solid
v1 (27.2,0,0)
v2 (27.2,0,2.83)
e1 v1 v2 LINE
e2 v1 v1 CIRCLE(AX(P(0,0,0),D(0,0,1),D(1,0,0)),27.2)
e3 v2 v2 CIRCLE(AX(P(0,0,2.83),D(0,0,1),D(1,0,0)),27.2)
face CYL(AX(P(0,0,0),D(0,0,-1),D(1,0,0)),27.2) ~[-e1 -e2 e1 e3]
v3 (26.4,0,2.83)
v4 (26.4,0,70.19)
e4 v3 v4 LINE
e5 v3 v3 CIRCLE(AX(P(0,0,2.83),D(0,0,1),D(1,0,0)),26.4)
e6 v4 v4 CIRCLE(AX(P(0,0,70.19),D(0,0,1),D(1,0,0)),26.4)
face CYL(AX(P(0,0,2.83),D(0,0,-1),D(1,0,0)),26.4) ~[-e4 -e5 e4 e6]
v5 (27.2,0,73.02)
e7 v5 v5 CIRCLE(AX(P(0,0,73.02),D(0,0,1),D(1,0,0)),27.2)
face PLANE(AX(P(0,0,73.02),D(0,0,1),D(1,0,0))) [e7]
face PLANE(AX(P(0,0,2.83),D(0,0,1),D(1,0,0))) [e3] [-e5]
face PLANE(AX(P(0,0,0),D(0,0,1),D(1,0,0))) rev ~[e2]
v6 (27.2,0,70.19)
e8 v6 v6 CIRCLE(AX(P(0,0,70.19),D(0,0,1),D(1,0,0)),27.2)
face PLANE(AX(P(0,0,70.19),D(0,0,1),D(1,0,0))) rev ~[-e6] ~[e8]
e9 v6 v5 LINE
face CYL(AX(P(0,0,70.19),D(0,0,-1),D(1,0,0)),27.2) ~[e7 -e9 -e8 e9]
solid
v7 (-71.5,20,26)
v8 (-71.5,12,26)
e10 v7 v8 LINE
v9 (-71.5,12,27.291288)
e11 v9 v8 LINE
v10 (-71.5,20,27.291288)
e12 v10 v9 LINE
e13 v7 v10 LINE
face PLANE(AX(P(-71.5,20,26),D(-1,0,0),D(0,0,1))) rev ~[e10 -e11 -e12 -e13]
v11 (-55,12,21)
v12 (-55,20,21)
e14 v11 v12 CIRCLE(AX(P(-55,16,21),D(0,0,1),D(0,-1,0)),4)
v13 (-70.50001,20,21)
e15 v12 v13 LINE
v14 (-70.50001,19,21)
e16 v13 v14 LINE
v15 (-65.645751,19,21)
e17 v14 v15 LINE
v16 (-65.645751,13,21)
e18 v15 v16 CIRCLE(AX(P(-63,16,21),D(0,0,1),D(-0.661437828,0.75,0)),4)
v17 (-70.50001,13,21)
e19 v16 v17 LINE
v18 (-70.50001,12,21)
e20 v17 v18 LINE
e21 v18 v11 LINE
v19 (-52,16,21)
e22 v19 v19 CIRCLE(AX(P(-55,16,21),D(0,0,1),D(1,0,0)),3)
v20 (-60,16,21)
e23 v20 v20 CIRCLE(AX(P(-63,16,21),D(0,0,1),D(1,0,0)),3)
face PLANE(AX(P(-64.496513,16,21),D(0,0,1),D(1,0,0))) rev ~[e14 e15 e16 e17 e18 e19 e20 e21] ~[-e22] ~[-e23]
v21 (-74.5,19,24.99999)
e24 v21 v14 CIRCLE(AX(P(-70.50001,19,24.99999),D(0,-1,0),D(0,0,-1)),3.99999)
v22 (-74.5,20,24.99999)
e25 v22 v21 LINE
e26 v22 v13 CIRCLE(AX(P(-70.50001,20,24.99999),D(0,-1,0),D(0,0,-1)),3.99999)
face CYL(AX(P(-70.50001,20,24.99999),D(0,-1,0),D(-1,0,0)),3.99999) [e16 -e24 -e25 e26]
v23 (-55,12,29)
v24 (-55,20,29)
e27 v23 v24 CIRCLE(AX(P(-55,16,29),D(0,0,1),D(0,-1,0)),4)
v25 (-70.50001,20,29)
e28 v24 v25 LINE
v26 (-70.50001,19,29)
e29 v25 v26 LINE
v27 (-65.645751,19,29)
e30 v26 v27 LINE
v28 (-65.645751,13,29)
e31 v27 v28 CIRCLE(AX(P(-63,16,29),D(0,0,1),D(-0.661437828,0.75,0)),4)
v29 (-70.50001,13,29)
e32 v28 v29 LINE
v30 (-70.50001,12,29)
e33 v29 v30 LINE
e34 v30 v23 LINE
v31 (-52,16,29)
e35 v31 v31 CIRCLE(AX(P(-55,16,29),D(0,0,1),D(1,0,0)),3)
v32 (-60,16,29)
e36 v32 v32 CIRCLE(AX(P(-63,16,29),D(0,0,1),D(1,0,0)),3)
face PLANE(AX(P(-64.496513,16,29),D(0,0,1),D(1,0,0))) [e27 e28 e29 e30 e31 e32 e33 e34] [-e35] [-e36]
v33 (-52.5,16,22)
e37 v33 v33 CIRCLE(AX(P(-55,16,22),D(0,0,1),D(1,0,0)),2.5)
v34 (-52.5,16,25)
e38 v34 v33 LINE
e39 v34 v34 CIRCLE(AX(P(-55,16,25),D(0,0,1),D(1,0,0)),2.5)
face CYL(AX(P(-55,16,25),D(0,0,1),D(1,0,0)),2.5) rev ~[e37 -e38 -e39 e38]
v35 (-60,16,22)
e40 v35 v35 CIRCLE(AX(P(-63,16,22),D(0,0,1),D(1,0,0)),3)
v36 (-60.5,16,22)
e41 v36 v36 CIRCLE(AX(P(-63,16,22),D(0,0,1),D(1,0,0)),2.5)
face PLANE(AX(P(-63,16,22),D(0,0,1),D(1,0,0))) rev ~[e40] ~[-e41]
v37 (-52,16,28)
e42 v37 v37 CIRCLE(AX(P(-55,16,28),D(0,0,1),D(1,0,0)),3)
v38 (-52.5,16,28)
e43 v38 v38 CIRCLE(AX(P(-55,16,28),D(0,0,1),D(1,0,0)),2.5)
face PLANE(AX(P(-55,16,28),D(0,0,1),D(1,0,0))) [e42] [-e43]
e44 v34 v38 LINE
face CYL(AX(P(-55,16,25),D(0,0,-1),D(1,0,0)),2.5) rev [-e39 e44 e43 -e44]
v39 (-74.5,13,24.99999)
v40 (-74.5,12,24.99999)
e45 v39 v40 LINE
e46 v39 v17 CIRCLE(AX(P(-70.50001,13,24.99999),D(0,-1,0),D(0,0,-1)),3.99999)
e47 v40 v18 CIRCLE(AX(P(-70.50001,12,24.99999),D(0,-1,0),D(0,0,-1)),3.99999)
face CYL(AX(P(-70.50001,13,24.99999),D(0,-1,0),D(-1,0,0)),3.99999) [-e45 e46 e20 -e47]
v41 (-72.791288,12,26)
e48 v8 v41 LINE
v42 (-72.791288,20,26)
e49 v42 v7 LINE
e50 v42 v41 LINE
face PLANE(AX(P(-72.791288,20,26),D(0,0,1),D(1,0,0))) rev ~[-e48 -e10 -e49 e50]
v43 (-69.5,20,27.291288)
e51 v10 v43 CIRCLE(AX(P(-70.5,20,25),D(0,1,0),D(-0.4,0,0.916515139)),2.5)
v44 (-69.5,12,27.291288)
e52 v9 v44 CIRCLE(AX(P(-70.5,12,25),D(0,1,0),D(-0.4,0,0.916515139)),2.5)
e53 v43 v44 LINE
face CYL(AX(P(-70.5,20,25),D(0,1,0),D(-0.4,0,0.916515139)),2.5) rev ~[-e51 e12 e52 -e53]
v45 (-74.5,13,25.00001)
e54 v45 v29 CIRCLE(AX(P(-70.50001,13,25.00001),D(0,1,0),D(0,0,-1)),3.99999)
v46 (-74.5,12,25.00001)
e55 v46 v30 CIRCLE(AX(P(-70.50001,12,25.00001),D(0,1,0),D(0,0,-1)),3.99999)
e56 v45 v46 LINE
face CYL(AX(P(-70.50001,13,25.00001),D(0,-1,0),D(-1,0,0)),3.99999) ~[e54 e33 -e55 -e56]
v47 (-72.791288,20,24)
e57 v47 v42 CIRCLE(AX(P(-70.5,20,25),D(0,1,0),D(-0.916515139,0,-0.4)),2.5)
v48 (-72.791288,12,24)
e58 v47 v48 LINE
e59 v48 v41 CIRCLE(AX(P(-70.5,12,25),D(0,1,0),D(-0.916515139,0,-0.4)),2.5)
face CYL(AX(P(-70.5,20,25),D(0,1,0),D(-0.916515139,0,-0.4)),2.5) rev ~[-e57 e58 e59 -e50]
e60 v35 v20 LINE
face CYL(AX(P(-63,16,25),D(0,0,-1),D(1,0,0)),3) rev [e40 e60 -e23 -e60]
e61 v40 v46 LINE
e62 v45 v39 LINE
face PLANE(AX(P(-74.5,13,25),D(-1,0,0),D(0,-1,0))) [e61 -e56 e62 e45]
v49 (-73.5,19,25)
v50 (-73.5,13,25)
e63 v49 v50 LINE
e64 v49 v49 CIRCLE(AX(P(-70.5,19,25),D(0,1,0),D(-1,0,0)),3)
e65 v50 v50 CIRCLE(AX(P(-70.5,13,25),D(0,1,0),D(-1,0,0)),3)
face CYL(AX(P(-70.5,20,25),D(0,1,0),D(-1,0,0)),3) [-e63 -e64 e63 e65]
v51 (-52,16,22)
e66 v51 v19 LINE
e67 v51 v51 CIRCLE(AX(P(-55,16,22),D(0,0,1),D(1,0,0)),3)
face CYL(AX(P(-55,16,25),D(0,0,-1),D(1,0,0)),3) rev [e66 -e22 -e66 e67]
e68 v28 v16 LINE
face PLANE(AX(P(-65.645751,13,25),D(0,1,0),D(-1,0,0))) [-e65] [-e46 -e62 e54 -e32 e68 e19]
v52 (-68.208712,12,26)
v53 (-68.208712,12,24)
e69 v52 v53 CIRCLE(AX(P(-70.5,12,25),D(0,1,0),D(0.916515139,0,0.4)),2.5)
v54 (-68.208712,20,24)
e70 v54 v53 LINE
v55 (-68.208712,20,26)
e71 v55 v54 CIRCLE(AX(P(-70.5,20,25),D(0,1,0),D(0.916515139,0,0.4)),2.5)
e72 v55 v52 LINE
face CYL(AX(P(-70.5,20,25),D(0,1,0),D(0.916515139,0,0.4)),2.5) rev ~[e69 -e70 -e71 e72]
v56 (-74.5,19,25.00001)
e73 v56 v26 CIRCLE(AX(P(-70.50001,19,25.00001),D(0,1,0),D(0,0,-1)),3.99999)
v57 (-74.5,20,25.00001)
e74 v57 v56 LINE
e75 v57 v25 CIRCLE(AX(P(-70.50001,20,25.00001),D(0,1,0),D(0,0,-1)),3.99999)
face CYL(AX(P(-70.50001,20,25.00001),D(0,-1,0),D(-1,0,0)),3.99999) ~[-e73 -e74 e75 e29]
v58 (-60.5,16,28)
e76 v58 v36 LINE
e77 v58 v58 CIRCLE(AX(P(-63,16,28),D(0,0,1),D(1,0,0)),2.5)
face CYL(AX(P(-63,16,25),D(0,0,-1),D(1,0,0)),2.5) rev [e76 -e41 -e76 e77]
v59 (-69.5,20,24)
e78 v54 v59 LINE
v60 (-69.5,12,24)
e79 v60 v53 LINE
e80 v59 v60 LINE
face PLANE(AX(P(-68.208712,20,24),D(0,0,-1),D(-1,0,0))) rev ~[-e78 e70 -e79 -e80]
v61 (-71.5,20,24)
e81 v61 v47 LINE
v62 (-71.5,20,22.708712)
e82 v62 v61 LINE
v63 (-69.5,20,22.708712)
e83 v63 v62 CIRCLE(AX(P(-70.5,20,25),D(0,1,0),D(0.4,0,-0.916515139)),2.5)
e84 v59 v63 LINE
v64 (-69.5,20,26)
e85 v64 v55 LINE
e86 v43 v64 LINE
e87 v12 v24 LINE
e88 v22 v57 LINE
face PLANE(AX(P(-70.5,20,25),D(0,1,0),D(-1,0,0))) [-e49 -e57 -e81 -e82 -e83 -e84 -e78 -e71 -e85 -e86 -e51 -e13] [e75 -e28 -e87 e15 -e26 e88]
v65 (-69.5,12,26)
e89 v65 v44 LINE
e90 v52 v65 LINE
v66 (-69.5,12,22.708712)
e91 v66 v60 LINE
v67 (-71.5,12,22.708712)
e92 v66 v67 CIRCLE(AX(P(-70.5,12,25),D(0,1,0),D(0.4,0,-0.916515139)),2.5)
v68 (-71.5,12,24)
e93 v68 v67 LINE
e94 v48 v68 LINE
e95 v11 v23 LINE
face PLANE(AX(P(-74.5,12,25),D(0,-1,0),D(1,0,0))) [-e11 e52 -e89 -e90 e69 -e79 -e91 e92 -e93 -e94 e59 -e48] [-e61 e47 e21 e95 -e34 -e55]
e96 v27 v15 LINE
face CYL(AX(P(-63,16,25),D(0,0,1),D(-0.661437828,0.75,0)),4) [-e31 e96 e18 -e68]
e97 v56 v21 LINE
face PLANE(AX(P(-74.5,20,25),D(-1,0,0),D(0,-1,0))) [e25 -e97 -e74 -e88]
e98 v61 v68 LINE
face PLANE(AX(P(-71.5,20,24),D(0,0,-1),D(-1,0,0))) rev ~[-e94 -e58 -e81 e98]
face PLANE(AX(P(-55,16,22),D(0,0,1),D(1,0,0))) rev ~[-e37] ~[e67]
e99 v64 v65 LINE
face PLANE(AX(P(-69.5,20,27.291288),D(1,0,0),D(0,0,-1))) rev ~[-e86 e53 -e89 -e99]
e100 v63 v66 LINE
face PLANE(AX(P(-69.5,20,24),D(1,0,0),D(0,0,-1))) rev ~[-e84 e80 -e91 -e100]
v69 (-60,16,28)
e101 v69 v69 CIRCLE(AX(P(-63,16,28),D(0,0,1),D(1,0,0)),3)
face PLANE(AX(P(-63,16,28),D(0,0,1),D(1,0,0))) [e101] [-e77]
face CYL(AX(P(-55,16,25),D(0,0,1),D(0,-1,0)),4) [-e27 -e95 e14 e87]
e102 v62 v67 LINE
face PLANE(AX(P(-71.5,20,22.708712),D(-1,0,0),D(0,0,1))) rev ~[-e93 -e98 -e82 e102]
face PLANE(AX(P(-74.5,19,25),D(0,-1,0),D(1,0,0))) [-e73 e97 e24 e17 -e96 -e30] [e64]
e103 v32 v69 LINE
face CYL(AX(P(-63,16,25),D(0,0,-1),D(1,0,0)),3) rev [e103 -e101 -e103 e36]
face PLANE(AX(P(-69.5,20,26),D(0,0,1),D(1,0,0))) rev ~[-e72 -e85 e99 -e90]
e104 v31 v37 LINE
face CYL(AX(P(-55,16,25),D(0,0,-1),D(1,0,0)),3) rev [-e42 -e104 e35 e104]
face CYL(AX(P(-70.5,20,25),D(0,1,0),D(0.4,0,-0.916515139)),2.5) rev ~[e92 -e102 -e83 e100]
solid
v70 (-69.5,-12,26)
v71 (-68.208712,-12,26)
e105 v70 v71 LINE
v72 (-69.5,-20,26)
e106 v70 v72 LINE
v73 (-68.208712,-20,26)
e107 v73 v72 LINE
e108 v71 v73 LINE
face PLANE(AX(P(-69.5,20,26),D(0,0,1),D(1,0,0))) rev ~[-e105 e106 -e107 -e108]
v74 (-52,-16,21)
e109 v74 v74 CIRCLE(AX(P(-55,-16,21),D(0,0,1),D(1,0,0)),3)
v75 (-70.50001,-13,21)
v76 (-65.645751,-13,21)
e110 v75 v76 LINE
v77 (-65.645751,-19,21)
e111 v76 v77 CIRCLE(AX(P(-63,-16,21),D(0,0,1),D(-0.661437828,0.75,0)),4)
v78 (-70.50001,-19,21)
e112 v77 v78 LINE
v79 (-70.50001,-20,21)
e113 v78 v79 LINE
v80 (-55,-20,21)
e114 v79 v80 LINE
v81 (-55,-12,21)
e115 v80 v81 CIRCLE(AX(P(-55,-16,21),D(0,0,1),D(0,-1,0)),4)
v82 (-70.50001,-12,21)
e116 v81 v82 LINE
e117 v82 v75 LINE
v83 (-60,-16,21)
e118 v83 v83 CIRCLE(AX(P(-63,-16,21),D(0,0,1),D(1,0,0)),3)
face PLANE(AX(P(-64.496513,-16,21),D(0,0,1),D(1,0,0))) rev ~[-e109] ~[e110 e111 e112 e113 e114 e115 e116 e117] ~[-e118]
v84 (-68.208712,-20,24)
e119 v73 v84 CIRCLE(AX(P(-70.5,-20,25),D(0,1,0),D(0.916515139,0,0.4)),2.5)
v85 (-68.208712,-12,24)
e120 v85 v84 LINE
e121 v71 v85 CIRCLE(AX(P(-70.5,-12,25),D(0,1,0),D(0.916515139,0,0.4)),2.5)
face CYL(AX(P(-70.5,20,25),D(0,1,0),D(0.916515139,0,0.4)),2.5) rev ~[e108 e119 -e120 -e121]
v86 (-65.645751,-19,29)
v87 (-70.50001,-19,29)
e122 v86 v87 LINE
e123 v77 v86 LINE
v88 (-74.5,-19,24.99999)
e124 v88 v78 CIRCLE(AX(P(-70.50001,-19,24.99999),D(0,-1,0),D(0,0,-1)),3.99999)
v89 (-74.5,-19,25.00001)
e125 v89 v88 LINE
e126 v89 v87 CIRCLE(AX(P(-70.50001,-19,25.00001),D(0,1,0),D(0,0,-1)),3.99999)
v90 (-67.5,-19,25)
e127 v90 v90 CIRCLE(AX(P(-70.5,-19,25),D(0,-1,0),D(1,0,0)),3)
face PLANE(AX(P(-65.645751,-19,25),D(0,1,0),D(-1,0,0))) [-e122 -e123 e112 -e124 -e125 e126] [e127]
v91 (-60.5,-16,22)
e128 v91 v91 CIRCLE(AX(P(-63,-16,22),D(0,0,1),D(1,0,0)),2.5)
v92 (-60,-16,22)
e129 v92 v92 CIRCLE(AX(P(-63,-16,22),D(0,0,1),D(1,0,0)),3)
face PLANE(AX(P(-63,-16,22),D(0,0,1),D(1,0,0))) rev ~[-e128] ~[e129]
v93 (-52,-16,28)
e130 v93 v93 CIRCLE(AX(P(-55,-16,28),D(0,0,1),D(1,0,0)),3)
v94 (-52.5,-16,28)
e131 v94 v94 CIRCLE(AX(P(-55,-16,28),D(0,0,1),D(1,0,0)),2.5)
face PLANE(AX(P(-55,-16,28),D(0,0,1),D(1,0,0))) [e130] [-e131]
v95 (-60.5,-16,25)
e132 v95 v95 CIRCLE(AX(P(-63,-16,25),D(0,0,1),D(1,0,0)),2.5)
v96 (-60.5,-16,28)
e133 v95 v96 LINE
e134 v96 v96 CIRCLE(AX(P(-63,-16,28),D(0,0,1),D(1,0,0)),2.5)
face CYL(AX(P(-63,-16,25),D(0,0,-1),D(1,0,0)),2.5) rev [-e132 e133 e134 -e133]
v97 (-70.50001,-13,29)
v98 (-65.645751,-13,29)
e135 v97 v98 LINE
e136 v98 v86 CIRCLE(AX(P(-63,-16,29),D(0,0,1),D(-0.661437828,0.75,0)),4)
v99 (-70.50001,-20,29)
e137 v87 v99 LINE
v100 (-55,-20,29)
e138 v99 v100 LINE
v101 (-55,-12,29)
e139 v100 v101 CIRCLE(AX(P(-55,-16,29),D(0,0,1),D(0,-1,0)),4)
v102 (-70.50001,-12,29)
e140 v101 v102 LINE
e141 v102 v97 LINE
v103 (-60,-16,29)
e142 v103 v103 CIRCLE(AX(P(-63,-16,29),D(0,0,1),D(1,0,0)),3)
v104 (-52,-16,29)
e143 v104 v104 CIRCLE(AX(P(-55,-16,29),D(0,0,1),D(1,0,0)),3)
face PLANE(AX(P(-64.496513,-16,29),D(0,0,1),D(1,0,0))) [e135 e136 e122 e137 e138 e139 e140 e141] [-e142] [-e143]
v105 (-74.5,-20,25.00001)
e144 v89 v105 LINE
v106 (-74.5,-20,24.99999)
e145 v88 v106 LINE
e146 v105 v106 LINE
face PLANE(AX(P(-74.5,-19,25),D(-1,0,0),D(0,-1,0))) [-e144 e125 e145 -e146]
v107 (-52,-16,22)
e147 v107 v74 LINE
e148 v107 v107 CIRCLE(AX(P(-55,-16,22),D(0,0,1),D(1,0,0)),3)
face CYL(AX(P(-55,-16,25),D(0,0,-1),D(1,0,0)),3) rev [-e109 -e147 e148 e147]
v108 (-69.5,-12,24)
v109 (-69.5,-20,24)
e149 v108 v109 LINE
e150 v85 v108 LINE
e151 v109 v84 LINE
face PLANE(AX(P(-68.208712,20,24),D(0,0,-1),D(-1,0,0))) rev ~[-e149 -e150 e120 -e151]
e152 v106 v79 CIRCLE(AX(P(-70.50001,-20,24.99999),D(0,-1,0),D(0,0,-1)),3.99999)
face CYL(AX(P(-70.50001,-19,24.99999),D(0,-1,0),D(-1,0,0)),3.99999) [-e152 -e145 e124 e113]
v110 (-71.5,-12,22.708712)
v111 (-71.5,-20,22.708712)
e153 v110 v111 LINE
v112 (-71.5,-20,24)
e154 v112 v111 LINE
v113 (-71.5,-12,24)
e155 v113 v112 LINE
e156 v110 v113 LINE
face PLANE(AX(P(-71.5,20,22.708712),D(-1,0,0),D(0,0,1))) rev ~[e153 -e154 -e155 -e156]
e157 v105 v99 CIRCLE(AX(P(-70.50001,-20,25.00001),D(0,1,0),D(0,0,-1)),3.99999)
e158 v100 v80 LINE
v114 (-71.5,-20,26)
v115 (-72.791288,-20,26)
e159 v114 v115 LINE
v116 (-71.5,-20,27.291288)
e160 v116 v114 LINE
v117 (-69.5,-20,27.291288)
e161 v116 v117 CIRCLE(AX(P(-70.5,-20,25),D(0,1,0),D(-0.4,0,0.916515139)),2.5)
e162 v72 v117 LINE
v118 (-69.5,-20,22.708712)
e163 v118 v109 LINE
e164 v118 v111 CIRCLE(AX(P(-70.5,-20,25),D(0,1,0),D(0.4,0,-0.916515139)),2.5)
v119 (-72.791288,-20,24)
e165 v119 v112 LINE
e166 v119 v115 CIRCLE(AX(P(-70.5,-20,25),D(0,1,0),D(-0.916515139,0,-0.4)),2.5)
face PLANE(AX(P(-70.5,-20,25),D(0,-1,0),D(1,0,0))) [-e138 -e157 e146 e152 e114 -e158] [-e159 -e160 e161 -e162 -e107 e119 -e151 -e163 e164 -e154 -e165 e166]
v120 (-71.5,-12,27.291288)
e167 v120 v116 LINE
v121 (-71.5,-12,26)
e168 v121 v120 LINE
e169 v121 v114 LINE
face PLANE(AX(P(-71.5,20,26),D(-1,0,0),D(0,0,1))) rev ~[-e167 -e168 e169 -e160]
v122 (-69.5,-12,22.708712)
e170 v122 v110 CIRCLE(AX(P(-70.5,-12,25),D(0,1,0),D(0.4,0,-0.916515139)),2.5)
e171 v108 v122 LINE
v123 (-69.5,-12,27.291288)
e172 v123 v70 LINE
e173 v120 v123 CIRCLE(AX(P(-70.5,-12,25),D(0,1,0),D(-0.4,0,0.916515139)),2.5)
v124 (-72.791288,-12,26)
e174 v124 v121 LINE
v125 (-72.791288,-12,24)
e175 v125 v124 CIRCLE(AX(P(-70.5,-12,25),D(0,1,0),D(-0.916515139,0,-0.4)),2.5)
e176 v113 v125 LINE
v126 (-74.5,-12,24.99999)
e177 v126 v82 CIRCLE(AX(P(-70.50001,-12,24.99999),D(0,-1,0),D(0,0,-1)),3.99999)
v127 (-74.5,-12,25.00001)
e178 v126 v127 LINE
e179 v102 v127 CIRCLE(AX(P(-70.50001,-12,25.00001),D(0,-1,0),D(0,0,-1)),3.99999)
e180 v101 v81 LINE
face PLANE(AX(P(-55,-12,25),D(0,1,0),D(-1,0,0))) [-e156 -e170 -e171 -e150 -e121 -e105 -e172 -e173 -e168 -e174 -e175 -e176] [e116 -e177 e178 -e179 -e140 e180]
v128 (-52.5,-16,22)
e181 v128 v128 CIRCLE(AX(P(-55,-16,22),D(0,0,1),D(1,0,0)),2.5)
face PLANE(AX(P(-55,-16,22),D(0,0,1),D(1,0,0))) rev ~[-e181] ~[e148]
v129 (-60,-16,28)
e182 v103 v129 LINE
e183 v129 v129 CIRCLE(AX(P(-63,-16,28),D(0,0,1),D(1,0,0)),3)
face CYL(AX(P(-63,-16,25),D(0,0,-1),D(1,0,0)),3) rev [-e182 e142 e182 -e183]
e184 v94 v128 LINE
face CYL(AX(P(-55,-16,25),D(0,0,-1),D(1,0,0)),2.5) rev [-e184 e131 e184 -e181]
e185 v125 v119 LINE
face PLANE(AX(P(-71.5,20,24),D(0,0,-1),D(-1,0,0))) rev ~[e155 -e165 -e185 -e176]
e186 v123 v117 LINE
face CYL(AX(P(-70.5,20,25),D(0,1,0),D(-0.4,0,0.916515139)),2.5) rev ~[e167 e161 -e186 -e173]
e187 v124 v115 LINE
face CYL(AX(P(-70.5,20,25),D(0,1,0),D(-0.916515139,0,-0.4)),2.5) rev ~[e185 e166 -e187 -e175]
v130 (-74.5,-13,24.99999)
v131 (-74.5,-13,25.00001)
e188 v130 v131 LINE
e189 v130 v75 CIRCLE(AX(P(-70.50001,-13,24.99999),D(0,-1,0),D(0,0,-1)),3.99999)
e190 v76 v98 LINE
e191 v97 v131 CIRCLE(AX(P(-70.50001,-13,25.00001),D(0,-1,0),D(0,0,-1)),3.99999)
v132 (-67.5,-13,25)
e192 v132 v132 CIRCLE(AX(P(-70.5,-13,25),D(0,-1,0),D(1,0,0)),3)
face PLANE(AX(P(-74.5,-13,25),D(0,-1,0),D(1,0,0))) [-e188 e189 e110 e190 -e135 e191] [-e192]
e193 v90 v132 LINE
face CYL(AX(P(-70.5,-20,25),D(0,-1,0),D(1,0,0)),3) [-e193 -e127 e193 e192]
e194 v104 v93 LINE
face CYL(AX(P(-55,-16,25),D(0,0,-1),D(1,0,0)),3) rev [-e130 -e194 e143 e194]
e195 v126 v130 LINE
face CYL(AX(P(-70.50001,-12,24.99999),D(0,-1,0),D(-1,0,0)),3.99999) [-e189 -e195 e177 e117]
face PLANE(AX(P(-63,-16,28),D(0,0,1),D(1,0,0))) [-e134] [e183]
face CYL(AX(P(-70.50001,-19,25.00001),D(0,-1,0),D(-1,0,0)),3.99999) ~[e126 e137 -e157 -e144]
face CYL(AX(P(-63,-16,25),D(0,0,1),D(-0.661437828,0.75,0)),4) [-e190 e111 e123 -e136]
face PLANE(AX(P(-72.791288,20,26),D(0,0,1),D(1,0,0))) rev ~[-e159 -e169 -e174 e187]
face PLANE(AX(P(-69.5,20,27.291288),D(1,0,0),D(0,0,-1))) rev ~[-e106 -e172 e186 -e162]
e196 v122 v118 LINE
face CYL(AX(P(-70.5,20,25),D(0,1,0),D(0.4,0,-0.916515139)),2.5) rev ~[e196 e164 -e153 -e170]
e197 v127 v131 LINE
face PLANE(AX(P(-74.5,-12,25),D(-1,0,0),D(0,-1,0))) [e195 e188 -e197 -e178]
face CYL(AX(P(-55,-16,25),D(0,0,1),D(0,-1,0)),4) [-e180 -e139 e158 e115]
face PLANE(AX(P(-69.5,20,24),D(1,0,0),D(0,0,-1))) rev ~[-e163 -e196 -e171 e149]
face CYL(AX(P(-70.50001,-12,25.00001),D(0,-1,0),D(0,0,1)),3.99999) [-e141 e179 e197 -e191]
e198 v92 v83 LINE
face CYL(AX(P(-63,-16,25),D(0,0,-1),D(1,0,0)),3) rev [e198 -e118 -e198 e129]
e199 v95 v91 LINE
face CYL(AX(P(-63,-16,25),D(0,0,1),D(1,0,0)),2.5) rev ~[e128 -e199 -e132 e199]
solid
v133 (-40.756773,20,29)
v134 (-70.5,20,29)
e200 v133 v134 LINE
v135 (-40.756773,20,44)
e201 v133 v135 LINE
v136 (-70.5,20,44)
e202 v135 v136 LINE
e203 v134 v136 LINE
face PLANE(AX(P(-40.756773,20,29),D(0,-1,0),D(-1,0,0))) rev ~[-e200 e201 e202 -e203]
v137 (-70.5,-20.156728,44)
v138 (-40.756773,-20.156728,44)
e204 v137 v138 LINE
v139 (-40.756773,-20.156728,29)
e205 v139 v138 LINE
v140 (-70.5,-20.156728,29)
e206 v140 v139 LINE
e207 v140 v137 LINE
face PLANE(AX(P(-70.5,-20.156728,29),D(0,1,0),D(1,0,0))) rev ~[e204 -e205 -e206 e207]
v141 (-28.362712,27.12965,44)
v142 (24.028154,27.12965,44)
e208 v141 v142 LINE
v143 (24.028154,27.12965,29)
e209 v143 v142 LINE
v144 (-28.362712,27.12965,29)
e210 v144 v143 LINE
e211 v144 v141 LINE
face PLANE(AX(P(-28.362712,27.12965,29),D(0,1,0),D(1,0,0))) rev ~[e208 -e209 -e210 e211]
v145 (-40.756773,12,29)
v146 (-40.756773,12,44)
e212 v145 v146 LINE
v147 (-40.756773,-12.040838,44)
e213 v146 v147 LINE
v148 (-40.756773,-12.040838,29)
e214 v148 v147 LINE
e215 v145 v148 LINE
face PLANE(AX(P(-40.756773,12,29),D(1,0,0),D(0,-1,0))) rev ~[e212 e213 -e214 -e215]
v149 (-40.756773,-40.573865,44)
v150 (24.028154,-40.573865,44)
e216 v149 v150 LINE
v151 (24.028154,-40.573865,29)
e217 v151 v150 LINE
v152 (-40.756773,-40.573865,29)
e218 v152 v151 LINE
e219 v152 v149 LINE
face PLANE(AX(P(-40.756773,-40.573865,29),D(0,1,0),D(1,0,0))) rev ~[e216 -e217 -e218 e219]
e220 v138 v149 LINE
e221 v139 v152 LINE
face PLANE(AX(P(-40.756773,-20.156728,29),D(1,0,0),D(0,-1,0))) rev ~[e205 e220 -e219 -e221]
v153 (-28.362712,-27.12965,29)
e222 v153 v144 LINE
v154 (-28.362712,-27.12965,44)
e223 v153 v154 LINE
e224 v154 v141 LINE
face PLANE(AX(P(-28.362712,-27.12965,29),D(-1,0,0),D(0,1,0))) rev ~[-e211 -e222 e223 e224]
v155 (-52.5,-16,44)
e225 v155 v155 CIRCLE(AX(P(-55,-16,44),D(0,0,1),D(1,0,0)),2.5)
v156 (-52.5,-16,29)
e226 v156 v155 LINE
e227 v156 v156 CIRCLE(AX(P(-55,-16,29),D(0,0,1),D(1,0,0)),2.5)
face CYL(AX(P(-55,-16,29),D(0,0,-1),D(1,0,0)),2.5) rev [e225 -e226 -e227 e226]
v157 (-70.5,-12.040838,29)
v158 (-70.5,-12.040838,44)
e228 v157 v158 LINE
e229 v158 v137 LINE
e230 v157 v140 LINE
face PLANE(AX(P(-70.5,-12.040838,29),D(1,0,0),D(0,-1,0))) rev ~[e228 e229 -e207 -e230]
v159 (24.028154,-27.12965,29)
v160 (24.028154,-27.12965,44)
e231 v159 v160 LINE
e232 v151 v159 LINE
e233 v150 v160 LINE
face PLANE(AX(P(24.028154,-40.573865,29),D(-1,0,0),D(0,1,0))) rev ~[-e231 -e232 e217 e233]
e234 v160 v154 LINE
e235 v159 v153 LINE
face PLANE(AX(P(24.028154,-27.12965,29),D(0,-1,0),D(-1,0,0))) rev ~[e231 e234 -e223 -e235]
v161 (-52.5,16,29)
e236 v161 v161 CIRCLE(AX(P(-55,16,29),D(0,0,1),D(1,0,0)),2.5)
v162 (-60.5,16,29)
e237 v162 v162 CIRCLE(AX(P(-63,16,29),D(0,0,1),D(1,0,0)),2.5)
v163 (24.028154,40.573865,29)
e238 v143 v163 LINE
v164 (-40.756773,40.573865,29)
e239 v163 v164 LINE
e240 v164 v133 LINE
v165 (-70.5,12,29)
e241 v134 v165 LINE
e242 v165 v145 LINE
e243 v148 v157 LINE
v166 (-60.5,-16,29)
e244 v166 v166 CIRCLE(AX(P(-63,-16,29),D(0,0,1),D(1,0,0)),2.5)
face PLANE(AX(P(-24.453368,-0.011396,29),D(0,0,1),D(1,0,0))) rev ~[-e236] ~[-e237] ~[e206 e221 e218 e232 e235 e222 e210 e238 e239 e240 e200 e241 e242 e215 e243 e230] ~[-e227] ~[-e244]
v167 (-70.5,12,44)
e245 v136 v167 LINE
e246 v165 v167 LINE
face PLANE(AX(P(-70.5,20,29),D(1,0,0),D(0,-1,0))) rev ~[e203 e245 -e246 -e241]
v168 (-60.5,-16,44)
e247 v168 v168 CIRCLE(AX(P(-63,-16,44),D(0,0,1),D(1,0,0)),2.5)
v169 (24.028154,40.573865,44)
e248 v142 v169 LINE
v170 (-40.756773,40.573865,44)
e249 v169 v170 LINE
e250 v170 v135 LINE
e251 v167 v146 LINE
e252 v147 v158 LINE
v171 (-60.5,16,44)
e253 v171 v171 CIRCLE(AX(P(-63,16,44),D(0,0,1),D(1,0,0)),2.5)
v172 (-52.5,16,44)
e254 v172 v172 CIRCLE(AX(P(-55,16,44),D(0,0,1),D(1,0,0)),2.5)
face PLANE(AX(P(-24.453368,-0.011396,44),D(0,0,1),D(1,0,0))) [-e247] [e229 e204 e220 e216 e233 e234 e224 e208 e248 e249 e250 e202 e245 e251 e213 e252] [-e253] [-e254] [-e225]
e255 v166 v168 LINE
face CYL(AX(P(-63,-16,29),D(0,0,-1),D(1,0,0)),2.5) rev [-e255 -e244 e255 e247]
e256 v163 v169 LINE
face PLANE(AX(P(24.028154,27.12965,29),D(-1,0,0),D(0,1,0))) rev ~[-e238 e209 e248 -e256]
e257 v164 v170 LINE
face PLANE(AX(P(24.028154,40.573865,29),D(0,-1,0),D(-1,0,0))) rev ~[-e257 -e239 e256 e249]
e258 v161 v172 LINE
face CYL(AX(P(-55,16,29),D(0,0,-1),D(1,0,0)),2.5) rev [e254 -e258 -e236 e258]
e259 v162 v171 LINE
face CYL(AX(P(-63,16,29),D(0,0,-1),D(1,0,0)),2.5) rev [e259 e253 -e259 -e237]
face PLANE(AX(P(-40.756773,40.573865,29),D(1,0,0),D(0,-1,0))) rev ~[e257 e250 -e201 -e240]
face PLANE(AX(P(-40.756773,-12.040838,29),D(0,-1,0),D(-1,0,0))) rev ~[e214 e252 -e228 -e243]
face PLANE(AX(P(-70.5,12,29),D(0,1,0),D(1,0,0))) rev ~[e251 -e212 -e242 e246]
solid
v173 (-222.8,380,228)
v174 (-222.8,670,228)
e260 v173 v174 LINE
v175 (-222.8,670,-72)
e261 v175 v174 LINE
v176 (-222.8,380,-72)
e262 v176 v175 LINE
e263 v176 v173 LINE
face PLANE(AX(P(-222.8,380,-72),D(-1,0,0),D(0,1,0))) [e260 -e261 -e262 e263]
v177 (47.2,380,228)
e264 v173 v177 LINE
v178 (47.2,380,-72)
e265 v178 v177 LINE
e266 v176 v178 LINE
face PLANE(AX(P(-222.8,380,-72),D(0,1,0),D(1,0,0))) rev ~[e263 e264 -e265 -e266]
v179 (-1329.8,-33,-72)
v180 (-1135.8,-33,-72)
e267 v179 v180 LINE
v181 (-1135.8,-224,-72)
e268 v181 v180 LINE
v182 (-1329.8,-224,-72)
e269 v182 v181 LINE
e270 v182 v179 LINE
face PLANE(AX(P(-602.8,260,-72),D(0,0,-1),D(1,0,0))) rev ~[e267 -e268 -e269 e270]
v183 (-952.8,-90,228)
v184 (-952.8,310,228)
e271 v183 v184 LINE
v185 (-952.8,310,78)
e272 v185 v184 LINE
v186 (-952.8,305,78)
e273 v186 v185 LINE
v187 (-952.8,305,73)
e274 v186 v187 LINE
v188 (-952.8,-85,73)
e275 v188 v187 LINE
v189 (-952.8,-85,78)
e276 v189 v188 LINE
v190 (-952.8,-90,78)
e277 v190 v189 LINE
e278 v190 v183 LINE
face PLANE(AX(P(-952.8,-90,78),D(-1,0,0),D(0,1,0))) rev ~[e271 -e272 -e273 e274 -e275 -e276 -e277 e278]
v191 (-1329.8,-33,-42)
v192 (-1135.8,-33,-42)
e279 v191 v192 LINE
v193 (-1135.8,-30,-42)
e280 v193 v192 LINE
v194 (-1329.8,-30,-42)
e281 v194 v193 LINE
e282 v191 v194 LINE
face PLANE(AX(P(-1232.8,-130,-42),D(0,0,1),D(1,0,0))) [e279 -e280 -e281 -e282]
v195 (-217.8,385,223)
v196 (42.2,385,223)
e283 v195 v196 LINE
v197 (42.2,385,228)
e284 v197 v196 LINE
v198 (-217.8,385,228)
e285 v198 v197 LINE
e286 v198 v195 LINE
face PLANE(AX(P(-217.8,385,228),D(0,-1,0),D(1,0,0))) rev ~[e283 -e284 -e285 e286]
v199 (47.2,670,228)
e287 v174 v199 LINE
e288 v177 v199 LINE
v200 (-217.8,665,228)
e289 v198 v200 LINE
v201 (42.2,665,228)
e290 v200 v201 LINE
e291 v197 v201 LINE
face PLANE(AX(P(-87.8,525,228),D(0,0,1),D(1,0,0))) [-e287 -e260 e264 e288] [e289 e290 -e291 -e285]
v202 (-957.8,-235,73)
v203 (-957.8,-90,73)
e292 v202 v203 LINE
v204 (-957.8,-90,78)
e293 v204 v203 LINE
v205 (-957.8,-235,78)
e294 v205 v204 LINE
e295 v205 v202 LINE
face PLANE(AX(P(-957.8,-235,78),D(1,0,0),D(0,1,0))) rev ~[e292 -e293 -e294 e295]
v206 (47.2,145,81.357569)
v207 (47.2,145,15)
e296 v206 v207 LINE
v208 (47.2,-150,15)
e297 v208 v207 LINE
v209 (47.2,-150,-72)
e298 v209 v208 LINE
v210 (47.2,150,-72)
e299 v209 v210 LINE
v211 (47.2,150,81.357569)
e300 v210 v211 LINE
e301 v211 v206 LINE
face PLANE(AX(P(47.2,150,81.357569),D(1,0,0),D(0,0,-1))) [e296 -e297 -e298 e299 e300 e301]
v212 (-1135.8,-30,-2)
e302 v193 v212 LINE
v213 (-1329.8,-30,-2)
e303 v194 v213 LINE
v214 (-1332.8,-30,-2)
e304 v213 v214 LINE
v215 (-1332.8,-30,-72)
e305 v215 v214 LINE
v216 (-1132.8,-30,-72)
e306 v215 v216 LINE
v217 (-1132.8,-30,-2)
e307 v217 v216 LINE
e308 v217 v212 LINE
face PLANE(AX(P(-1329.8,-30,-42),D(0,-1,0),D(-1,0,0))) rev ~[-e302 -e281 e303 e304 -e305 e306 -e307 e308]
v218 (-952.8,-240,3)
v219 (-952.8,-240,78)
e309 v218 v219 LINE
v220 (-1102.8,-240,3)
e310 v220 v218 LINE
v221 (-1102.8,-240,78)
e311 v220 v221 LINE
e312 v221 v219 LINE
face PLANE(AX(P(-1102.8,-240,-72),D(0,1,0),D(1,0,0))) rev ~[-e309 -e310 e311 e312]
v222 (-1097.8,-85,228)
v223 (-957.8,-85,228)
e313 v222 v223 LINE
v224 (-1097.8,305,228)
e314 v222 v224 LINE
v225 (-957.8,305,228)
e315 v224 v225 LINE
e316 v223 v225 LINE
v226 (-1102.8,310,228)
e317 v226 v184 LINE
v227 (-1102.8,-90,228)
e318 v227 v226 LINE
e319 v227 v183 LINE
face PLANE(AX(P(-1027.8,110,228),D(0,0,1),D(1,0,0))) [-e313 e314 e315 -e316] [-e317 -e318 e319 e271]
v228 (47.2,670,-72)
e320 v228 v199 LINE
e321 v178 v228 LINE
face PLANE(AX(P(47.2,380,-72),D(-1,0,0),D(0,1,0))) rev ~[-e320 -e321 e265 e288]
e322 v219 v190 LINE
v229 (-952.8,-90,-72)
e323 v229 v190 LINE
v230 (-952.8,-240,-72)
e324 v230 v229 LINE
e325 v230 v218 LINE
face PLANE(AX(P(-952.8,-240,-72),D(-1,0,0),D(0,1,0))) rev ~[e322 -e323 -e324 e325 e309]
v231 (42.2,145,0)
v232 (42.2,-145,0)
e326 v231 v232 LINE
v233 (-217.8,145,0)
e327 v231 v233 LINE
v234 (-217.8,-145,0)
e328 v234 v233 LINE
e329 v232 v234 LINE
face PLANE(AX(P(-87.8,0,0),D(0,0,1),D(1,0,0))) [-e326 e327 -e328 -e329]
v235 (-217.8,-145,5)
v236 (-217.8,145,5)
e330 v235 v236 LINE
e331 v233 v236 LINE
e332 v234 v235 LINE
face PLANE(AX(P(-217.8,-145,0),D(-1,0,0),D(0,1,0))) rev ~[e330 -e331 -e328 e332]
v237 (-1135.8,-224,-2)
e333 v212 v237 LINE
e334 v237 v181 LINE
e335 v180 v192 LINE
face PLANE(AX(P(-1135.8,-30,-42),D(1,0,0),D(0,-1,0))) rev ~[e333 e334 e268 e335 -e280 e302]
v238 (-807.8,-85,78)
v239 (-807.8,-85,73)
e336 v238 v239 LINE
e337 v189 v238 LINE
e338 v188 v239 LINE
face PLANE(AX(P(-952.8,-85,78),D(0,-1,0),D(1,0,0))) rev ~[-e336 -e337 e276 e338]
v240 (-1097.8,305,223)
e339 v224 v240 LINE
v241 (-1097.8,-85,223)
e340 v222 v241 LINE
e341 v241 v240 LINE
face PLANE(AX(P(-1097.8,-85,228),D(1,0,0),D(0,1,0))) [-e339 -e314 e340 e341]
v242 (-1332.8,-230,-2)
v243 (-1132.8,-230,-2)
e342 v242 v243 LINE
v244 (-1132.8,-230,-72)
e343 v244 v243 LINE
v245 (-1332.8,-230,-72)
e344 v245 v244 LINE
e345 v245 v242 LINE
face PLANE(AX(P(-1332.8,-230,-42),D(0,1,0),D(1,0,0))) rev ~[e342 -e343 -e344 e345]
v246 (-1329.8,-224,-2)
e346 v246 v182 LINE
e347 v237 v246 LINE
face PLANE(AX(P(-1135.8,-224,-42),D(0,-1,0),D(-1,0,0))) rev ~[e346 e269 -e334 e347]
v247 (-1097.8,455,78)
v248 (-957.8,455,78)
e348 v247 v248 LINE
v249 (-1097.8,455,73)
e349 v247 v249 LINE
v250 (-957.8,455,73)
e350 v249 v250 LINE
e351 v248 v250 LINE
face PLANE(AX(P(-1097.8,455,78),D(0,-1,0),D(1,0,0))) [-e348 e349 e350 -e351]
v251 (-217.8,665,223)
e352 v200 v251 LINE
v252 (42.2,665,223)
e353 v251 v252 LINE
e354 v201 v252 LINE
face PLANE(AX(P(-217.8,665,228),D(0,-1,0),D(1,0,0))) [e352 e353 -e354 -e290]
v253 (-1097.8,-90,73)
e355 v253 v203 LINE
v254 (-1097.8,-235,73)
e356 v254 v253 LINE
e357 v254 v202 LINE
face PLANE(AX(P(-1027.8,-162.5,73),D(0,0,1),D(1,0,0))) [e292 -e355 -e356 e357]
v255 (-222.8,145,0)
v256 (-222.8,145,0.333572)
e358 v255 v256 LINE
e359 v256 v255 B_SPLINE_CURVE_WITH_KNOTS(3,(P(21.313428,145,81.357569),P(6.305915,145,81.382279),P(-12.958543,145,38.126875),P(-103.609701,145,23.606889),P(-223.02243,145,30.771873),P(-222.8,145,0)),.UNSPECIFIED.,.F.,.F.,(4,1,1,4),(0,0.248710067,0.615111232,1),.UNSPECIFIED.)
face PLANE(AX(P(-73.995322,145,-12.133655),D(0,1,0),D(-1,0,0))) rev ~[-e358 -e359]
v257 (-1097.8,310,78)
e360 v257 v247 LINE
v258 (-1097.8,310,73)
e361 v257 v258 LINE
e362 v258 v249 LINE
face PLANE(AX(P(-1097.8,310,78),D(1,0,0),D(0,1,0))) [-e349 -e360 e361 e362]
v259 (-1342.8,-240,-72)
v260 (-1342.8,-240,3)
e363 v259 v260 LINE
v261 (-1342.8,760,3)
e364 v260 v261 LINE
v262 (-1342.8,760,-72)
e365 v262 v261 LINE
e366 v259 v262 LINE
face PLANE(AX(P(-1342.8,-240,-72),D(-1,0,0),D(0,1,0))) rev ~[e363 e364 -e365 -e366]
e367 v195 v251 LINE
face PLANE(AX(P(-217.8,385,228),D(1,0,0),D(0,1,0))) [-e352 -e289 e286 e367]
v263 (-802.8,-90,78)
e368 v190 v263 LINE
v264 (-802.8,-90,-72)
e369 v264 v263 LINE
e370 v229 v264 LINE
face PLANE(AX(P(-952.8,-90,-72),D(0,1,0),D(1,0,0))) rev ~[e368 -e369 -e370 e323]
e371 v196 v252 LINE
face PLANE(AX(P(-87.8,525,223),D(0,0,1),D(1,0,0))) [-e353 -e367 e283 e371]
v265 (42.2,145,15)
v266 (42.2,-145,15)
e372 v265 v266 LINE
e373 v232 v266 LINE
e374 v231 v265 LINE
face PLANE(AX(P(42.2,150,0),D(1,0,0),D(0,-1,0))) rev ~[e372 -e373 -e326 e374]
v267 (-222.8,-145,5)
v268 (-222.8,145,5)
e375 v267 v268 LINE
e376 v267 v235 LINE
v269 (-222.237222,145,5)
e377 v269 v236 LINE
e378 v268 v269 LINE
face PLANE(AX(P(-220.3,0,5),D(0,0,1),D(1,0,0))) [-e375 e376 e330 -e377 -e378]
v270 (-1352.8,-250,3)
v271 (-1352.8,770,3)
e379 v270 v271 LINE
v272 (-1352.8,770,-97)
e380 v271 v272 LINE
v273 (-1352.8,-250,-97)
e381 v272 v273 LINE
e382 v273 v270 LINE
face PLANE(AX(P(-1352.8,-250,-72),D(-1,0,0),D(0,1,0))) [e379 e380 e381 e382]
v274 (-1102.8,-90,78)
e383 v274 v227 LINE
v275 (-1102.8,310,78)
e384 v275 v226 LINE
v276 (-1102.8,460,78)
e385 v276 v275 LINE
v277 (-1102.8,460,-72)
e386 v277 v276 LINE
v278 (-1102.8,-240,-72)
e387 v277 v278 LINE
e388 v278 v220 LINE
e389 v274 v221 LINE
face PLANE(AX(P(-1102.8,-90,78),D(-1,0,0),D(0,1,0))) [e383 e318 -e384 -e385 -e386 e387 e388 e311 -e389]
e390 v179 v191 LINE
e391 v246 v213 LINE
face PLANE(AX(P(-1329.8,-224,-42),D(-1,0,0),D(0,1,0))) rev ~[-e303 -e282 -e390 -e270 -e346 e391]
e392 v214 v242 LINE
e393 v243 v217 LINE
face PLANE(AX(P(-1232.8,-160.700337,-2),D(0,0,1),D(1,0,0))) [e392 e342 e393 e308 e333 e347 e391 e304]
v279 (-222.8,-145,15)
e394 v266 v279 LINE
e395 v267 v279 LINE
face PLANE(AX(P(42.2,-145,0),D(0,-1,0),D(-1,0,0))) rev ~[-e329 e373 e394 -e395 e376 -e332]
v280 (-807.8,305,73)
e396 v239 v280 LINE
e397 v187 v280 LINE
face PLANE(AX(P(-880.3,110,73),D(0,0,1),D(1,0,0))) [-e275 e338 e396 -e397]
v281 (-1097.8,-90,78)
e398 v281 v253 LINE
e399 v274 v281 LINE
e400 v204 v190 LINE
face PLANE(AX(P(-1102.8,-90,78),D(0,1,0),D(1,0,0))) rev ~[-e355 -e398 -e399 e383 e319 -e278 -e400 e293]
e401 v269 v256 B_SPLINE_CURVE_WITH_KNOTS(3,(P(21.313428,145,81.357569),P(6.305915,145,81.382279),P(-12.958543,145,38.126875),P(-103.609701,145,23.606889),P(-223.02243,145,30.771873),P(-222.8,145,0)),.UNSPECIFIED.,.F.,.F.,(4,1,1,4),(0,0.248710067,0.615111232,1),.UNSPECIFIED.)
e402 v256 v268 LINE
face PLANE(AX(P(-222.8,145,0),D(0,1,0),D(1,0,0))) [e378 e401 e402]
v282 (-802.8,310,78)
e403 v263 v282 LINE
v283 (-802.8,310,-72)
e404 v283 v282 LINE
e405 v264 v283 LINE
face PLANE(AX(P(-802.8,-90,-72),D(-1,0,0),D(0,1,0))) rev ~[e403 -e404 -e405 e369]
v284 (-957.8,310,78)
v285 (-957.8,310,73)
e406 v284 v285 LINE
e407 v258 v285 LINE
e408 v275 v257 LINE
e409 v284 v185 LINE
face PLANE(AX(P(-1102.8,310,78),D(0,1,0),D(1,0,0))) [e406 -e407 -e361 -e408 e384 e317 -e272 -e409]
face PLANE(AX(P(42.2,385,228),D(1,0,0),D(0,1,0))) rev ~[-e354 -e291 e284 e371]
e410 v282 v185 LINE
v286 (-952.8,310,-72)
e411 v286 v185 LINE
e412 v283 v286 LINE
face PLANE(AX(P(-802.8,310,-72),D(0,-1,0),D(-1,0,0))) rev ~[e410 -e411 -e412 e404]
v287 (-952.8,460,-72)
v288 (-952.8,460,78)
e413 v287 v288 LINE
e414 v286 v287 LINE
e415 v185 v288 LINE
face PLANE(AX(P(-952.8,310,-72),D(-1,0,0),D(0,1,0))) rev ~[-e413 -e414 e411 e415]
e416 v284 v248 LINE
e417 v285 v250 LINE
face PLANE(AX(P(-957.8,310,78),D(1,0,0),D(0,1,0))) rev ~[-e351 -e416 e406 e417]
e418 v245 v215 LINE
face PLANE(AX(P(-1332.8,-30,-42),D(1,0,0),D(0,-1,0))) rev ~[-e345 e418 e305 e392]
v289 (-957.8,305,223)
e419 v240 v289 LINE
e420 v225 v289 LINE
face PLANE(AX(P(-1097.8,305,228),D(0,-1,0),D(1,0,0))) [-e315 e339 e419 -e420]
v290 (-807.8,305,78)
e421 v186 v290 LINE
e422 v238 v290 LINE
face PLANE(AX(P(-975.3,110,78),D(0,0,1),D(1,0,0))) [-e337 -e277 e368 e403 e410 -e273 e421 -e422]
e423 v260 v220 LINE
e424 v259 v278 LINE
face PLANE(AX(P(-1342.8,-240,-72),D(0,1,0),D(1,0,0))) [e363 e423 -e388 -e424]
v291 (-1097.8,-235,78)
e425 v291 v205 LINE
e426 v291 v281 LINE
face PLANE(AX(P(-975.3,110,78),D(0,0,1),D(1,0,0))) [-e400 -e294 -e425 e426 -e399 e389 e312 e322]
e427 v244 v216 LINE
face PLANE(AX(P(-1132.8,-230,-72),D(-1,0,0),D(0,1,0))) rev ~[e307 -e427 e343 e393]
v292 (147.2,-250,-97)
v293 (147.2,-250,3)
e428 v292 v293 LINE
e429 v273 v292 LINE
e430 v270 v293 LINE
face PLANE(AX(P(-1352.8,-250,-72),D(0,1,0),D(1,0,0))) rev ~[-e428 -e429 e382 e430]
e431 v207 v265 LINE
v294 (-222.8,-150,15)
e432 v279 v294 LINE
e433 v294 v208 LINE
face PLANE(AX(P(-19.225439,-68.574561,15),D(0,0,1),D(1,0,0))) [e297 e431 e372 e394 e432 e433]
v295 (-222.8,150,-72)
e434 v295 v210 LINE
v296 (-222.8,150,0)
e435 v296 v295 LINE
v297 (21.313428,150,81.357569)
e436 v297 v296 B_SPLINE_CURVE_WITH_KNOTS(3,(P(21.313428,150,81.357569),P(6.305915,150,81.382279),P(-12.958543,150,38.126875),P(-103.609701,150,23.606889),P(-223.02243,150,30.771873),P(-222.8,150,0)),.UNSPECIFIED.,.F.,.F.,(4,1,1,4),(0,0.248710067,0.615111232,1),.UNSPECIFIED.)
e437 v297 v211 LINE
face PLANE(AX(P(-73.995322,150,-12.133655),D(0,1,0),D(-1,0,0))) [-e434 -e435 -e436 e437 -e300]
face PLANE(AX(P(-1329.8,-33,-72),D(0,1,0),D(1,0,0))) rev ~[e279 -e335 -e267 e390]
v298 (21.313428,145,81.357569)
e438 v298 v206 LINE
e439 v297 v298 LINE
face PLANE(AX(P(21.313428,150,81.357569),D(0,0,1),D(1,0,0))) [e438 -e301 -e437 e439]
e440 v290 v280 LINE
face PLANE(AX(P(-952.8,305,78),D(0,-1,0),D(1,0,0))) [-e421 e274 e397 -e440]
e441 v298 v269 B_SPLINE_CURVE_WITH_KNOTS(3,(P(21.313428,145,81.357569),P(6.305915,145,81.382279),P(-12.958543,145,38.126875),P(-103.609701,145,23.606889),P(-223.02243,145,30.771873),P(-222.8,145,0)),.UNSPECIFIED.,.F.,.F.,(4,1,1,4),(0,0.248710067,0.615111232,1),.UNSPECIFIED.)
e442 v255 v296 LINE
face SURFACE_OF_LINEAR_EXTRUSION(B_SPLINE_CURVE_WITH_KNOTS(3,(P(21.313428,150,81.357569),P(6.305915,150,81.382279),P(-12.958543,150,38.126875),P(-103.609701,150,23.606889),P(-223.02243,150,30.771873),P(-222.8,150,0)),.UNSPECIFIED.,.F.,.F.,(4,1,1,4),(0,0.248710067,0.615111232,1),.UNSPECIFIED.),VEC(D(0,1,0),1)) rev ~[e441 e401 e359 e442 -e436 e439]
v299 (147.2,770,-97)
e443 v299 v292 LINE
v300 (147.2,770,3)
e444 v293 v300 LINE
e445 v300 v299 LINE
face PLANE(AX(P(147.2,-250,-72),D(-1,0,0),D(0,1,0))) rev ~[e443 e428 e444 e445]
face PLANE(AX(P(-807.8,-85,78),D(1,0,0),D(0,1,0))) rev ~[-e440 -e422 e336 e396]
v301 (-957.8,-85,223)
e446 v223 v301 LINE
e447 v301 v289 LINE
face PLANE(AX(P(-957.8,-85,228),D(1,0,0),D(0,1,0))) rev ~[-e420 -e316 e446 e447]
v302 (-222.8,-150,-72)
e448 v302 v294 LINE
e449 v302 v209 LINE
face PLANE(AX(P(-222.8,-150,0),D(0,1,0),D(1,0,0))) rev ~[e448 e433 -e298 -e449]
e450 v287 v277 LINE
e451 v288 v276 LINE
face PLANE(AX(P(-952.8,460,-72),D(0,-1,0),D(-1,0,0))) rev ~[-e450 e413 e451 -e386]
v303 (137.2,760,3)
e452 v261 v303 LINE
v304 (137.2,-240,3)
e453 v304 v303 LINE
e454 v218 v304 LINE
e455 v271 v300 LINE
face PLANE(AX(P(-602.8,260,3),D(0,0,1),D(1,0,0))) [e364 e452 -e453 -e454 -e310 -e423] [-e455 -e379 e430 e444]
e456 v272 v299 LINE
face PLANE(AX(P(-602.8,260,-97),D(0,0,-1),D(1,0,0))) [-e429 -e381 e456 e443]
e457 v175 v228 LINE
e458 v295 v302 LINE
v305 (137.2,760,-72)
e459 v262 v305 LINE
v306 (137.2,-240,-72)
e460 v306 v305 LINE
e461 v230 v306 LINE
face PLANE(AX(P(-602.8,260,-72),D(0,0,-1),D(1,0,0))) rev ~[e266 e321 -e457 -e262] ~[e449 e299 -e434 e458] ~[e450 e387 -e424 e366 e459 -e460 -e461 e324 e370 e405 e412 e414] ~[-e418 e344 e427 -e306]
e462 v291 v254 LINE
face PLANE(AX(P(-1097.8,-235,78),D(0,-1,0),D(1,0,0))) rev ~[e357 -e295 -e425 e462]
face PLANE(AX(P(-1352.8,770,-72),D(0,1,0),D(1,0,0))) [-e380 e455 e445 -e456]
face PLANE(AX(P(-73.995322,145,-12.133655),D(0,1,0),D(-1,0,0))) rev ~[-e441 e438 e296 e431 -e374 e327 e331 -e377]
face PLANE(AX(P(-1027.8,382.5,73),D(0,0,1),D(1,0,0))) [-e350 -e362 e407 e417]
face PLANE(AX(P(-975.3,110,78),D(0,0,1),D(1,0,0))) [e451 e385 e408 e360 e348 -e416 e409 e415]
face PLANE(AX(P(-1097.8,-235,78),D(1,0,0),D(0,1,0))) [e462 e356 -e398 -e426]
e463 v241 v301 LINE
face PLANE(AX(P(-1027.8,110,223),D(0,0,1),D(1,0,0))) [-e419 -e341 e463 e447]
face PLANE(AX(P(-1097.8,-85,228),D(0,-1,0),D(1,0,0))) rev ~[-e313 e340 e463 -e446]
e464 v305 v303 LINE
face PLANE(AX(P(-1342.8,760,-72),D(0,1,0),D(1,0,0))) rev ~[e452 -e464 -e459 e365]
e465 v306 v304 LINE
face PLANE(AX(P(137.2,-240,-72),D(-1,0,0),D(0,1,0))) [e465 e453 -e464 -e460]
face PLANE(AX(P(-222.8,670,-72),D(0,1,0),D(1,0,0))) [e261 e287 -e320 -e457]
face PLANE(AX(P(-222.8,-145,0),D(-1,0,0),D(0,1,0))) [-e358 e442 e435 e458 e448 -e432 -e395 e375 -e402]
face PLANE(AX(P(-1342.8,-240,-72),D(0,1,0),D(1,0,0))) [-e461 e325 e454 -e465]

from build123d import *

# Parameters (mm, degrees)
F0_R      = 27.2
F1_DEPTH  = 2.83
F2_R      = 26.4
F3_DEPTH  = 67.36
F4_R      = 27.2
F5_DEPTH  = 2.83
F9_W      = 270
F9_H      = 300
F10_DEPTH = 72
F12_DEPTH = 15
F14_DEPTH = 5
F15_W     = 5
F15_H     = 290
F16_DEPTH = 5
F17_W     = 1500
F17_H     = 1020
F18_DEPTH = 25
F19_W     = 270
F19_H     = 290
F20_DEPTH = 300
F21_W     = 260
F21_H     = 280
F22_DEPTH = 5
F23_W     = 1500
F23_H     = 1020
F23_W_2   = 1480
F23_H_2   = 1000
F24_DEPTH = 75
F26_DEPTH = 150
F27_W     = 150
F27_H     = 400
F28_DEPTH = 150
F29_W     = 140
F29_H     = 390
F30_DEPTH = 5
F31_W     = 140
F31_H     = 145
F31_W_2   = 145
F31_H_2   = 390
F32_DEPTH = 5
F33_R     = 3
F34_DEPTH = 4
F35_R     = 3.99999
F35_2_R   = 3.99999
F36_R     = 3
F37_DEPTH = 8
F38_R     = 3
F39_DEPTH = 8
F40_R     = 3
F40_R_2   = 2.5
F41_DEPTH = 3
F42_R     = 3
F42_R_2   = 2.5
F43_DEPTH = 3
F45_DEPTH = 270.001
F46_W     = 200
F46_H     = 200
F46_W_2   = 194
F46_H_2   = 191
F47_DEPTH = 30
F49_DEPTH = 40
F50_R     = 2.5
F51_DEPTH = 15


# Not quite as in the source:
# - a fillet or chamfer is up to 0.001 mm smaller than in the source, because OpenCascade refuses the exact size
# - a feature names something its author has since deleted; it is built from what else it names


with BuildPart() as f1:
    # F0 (on Top) → F1 (new body)
    with BuildSketch(Plane.XY):
        Circle(F0_R)
    extrude(amount=F1_DEPTH)

    # F2 (on face) → F3 (join)
    with BuildSketch(Plane.XY.offset(2.83)):
        Circle(F2_R)
    extrude(amount=F3_DEPTH)

    # F4 (on face) → F5 (join)
    with BuildSketch(Plane.XY.offset(70.19)):
        Circle(F4_R)
    extrude(amount=F5_DEPTH)


with BuildPart() as f10:
    # F9 (on Top) → F10 (new body)
    with BuildSketch(Plane.XY):
        with Locations((-87.8, 0)):
            Rectangle(F9_W, F9_H)
    extrude(amount=-F10_DEPTH)

    # F11 (on face) → F12 (join)
    with BuildSketch(Plane.XY):
        Polygon((-222.8, -145), (-222.8, -150), (47.2, -150), (47.2, 150), (42.2, 150), (42.2, -145), align=None)
    extrude(amount=F12_DEPTH)

    # F13 (on face) → F14 (join)
    with BuildSketch(Plane(origin=(0, 150, 0), x_dir=(-1, 0, 0), z_dir=(0, 1, 0))):
        with BuildLine():
            Line((-21.3134280931, 81.3575685024), (-47.2, 81.3575685024))
            Line((-47.2, 81.3575685024), (-47.2, -72))
            Line((-47.2, -72), (222.8, -72))
            Line((222.8, -72), (222.8, 0))
            add(Edge.make_bspline(
                [(-21.3134280931, 81.3575685024), (-6.3059147253, 81.3822787863), (12.9585432644, 38.1268753575), (103.6097013063, 23.6068887567), (223.0224295336, 30.7718731823), (222.8, 0)],
                knots=[0, 0, 0, 0, 0.2487100673, 0.6151112321, 1, 1, 1, 1], degree=3))
        make_face()
    extrude(amount=-F14_DEPTH)

    # F15 (on face) → F16 (join)
    with BuildSketch(Plane.XY):
        with Locations((-220.3, 0)):
            Rectangle(F15_W, F15_H)
    extrude(amount=F16_DEPTH)

    # F17 (on face) → F18 (join)
    with BuildSketch(Plane(origin=(0, 0, -72), x_dir=(1, 0, 0), z_dir=(0, 0, -1))):
        with Locations((-602.8, -260)):
            Rectangle(F17_W, F17_H)
    extrude(amount=F18_DEPTH)

    # F19 (on face) → F20 (join)
    with BuildSketch(Plane.XY.offset(-72)):
        with Locations((-87.8, 525)):
            Rectangle(F19_W, F19_H)
    extrude(amount=F20_DEPTH)

    # F21 (on face) → F22 (cut)
    with BuildSketch(Plane.XY.offset(228)):
        with Locations((-87.8, 525)):
            Rectangle(F21_W, F21_H)
    extrude(amount=-F22_DEPTH, mode=Mode.SUBTRACT)

    # F23 (on face) → F24 (join)
    with BuildSketch(Plane.XY.offset(-72)):
        with Locations((-602.8, 260)):
            Rectangle(F23_W, F23_H)
        with Locations((-602.8, 260)):
            Rectangle(F23_W_2, F23_H_2, mode=Mode.SUBTRACT)
    extrude(amount=F24_DEPTH)

    # F25 (on face) → F26 (join)
    with BuildSketch(Plane.XY.offset(-72)):
        Polygon((-952.8, 460), (-1102.8, 460), (-1102.8, -240), (-952.8, -240), (-952.8, -90), (-802.8, -90), (-802.8, 310), (-952.8, 310), align=None)
    extrude(amount=F26_DEPTH)

    # F27 (on face) → F28 (join)
    with BuildSketch(Plane.XY.offset(78)):
        with Locations((-1027.8, 110)):
            Rectangle(F27_W, F27_H)
    extrude(amount=F28_DEPTH)

    # F29 (on face) → F30 (cut)
    with BuildSketch(Plane.XY.offset(228)):
        with Locations((-1027.8, 110)):
            Rectangle(F29_W, F29_H)
    extrude(amount=-F30_DEPTH, mode=Mode.SUBTRACT)

    # F31 (on face) → F32 (cut)
    with BuildSketch(Plane.XY.offset(78)):
        with Locations((-1027.8, 382.5)):
            Rectangle(F31_W, F31_H)
        with Locations((-880.3, 110)):
            Rectangle(F31_W_2, F31_H_2)
        with Locations((-1027.8, -162.5)):
            Rectangle(F31_W, F31_H)
    extrude(amount=-F32_DEPTH, mode=Mode.SUBTRACT)

    # F46 (on face) → F47 (join)
    with BuildSketch(Plane.XY.offset(-72)):
        with Locations((-1232.8, -130)):
            Rectangle(F46_W, F46_H)
        with Locations((-1232.8, -128.5)):
            Rectangle(F46_W_2, F46_H_2, mode=Mode.SUBTRACT)
    extrude(amount=F47_DEPTH)

    # F48 (on face) → F49 (join)
    with BuildSketch(Plane.XY.offset(-42)):
        Polygon((-1329.8, -30), (-1332.8, -30), (-1332.8, -230), (-1329.8, -230), (-1135.8, -230), (-1132.8, -230), (-1132.8, -30), (-1135.8, -30), (-1135.8, -224), (-1329.8, -224), align=None)
    extrude(amount=F49_DEPTH)


with BuildPart() as f34:
    # F33 (on offset) → F34 (new body, symmetric)
    with BuildSketch(Plane.XY.offset(25)):
        with BuildLine():
            Line((-55, -12), (-74.5, -12))
            Line((-74.5, -12), (-74.5, -13))
            Line((-74.5, -13), (-65.6457513111, -13))
            ThreePointArc((-65.6457513111, -13), (-67, -16), (-65.6457513111, -19))
            Line((-65.6457513111, -19), (-74.5, -19))
            Line((-74.5, -19), (-74.5, -20))
            Line((-74.5, -20), (-55, -20))
            ThreePointArc((-55, -20), (-51, -16), (-55, -12))
        make_face()
        with Locations((-63, -16)):
            Circle(F33_R, mode=Mode.SUBTRACT)
        with Locations((-55, -16)):
            Circle(F33_R, mode=Mode.SUBTRACT)
    extrude(amount=F34_DEPTH, both=True)

    # F35 (radius 4 in the source; OpenCascade refuses exactly that, so slightly less here)
    f35_edges = [f34.edges().sort_by_distance(p)[0] for p in [
        (-74.5, -19.5, 29),
        (-74.5, -12.5, 29),
        (-74.5, -19.5, 21),
        (-74.5, -12.5, 21),
    ]]
    fillet(f35_edges, radius=F35_R)

    # F36 (on face) → F37 (join, through all)
    with BuildSketch(Plane.XZ.offset(20)):
        with Locations((-70.5, 25)):
            Circle(F36_R)
    extrude(amount=-F37_DEPTH)

    # F42 (on offset) → F43 (join, symmetric)
    with BuildSketch(Plane.XY.offset(25)):
        with Locations((-63, -16)):
            Circle(F42_R)
        with Locations((-63, -16)):
            Circle(F42_R_2, mode=Mode.SUBTRACT)
        with Locations((-55, -16)):
            Circle(F42_R)
        with Locations((-55, -16)):
            Circle(F42_R_2, mode=Mode.SUBTRACT)
    extrude(amount=F43_DEPTH, both=True)


with BuildPart() as f34b:
    # F33 (on offset) → F34, piece 2 (new body, symmetric)
    with BuildSketch(Plane.XY.offset(25)):
        with BuildLine():
            Line((-74.5, 13), (-74.5, 12))
            Line((-74.5, 12), (-55, 12))
            ThreePointArc((-55, 12), (-51, 16), (-55, 20))
            Line((-55, 20), (-74.5, 20))
            Line((-74.5, 20), (-74.5, 19))
            Line((-74.5, 19), (-65.6457513111, 19))
            ThreePointArc((-65.6457513111, 19), (-67, 16), (-65.6457513111, 13))
            Line((-65.6457513111, 13), (-74.5, 13))
        make_face()
        with Locations((-63, 16)):
            Circle(F33_R, mode=Mode.SUBTRACT)
        with Locations((-55, 16)):
            Circle(F33_R, mode=Mode.SUBTRACT)
    extrude(amount=F34_DEPTH, both=True)

    # F35#2 (radius 4 in the source; OpenCascade refuses exactly that, so slightly less here)
    f35_2_edges = [f34b.edges().sort_by_distance(p)[0] for p in [
        (-74.5, 12.5, 29),
        (-74.5, 19.5, 29),
        (-74.5, 19.5, 21),
        (-74.5, 12.5, 21),
    ]]
    fillet(f35_2_edges, radius=F35_2_R)

    # F38 (on face) → F39 (join, through all)
    with BuildSketch(Plane(origin=(0, 20, 0), x_dir=(-1, 0, 0), z_dir=(0, 1, 0))):
        with Locations((70.5, 25)):
            Circle(F38_R)
    extrude(amount=-F39_DEPTH)

    # F40 (on offset) → F41 (join, symmetric)
    with BuildSketch(Plane.XY.offset(25)):
        with Locations((-55, 16)):
            Circle(F40_R)
        with Locations((-55, 16)):
            Circle(F40_R_2, mode=Mode.SUBTRACT)
        with Locations((-63, 16)):
            Circle(F40_R)
        with Locations((-63, 16)):
            Circle(F40_R_2, mode=Mode.SUBTRACT)
    extrude(amount=F41_DEPTH, both=True)


with BuildPart() as f45_tool:
    # F44 (on face) → F45 (new body, through all)
    with BuildSketch(Plane(origin=(0, 20, 0), x_dir=(-1, 0, 0), z_dir=(0, 1, 0))):
        with BuildLine():
            Line((71.5, 26), (71.5, 27.2912878475))
            ThreePointArc((71.5, 27.2912878475), (70.5, 27.5), (69.5, 27.2912878475))
            Line((69.5, 27.2912878475), (69.5, 26))
            Line((69.5, 26), (68.2087121525, 26))
            ThreePointArc((68.2087121525, 26), (68, 25), (68.2087121525, 24))
            Line((68.2087121525, 24), (69.5, 24))
            Line((69.5, 24), (69.5, 22.7087121525))
            ThreePointArc((69.5, 22.7087121525), (70.5, 22.5), (71.5, 22.7087121525))
            Line((71.5, 22.7087121525), (71.5, 24))
            Line((71.5, 24), (72.7912878475, 24))
            ThreePointArc((72.7912878475, 24), (73, 25), (72.7912878475, 26))
            Line((72.7912878475, 26), (71.5, 26))
        make_face()
    extrude(amount=-F45_DEPTH)


with BuildPart() as f34_1:
    add(f34.part)

    # F45: cut by f45_tool
    add(f45_tool.part, mode=Mode.SUBTRACT)


with BuildPart() as f34b_1:
    add(f34b.part)

    # F45: cut by f45_tool
    add(f45_tool.part, mode=Mode.SUBTRACT)


with BuildPart() as f51:
    # F50 (on face) → F51 (new body)
    with BuildSketch(Plane.XY.offset(29)):
        Polygon((-70.5, 20), (-70.5, 12), (-40.7567732036, 12), (-40.7567732036, -12.0408376679), (-70.5, -12.0408376679), (-70.5, -20.1567281038), (-40.7567732036, -20.1567281038), (-40.7567732036, -40.5738651752), (24.02815409, -40.5738651752), (24.02815409, -27.129650116), (-28.3627118915, -27.129650116), (-28.3627118915, 27.129650116), (24.02815409, 27.129650116), (24.02815409, 40.5738651752), (-40.7567732036, 40.5738651752), (-40.7567732036, 20), align=None)
        with Locations((-63, -16)):
            Circle(F50_R, mode=Mode.SUBTRACT)
        with Locations((-55, -16)):
            Circle(F50_R, mode=Mode.SUBTRACT)
        with Locations((-63, 16)):
            Circle(F50_R, mode=Mode.SUBTRACT)
        with Locations((-55, 16)):
            Circle(F50_R, mode=Mode.SUBTRACT)
    extrude(amount=F51_DEPTH)


solid = Compound([f1.part, f10.part, f34_1.part, f34b_1.part, f51.part])
